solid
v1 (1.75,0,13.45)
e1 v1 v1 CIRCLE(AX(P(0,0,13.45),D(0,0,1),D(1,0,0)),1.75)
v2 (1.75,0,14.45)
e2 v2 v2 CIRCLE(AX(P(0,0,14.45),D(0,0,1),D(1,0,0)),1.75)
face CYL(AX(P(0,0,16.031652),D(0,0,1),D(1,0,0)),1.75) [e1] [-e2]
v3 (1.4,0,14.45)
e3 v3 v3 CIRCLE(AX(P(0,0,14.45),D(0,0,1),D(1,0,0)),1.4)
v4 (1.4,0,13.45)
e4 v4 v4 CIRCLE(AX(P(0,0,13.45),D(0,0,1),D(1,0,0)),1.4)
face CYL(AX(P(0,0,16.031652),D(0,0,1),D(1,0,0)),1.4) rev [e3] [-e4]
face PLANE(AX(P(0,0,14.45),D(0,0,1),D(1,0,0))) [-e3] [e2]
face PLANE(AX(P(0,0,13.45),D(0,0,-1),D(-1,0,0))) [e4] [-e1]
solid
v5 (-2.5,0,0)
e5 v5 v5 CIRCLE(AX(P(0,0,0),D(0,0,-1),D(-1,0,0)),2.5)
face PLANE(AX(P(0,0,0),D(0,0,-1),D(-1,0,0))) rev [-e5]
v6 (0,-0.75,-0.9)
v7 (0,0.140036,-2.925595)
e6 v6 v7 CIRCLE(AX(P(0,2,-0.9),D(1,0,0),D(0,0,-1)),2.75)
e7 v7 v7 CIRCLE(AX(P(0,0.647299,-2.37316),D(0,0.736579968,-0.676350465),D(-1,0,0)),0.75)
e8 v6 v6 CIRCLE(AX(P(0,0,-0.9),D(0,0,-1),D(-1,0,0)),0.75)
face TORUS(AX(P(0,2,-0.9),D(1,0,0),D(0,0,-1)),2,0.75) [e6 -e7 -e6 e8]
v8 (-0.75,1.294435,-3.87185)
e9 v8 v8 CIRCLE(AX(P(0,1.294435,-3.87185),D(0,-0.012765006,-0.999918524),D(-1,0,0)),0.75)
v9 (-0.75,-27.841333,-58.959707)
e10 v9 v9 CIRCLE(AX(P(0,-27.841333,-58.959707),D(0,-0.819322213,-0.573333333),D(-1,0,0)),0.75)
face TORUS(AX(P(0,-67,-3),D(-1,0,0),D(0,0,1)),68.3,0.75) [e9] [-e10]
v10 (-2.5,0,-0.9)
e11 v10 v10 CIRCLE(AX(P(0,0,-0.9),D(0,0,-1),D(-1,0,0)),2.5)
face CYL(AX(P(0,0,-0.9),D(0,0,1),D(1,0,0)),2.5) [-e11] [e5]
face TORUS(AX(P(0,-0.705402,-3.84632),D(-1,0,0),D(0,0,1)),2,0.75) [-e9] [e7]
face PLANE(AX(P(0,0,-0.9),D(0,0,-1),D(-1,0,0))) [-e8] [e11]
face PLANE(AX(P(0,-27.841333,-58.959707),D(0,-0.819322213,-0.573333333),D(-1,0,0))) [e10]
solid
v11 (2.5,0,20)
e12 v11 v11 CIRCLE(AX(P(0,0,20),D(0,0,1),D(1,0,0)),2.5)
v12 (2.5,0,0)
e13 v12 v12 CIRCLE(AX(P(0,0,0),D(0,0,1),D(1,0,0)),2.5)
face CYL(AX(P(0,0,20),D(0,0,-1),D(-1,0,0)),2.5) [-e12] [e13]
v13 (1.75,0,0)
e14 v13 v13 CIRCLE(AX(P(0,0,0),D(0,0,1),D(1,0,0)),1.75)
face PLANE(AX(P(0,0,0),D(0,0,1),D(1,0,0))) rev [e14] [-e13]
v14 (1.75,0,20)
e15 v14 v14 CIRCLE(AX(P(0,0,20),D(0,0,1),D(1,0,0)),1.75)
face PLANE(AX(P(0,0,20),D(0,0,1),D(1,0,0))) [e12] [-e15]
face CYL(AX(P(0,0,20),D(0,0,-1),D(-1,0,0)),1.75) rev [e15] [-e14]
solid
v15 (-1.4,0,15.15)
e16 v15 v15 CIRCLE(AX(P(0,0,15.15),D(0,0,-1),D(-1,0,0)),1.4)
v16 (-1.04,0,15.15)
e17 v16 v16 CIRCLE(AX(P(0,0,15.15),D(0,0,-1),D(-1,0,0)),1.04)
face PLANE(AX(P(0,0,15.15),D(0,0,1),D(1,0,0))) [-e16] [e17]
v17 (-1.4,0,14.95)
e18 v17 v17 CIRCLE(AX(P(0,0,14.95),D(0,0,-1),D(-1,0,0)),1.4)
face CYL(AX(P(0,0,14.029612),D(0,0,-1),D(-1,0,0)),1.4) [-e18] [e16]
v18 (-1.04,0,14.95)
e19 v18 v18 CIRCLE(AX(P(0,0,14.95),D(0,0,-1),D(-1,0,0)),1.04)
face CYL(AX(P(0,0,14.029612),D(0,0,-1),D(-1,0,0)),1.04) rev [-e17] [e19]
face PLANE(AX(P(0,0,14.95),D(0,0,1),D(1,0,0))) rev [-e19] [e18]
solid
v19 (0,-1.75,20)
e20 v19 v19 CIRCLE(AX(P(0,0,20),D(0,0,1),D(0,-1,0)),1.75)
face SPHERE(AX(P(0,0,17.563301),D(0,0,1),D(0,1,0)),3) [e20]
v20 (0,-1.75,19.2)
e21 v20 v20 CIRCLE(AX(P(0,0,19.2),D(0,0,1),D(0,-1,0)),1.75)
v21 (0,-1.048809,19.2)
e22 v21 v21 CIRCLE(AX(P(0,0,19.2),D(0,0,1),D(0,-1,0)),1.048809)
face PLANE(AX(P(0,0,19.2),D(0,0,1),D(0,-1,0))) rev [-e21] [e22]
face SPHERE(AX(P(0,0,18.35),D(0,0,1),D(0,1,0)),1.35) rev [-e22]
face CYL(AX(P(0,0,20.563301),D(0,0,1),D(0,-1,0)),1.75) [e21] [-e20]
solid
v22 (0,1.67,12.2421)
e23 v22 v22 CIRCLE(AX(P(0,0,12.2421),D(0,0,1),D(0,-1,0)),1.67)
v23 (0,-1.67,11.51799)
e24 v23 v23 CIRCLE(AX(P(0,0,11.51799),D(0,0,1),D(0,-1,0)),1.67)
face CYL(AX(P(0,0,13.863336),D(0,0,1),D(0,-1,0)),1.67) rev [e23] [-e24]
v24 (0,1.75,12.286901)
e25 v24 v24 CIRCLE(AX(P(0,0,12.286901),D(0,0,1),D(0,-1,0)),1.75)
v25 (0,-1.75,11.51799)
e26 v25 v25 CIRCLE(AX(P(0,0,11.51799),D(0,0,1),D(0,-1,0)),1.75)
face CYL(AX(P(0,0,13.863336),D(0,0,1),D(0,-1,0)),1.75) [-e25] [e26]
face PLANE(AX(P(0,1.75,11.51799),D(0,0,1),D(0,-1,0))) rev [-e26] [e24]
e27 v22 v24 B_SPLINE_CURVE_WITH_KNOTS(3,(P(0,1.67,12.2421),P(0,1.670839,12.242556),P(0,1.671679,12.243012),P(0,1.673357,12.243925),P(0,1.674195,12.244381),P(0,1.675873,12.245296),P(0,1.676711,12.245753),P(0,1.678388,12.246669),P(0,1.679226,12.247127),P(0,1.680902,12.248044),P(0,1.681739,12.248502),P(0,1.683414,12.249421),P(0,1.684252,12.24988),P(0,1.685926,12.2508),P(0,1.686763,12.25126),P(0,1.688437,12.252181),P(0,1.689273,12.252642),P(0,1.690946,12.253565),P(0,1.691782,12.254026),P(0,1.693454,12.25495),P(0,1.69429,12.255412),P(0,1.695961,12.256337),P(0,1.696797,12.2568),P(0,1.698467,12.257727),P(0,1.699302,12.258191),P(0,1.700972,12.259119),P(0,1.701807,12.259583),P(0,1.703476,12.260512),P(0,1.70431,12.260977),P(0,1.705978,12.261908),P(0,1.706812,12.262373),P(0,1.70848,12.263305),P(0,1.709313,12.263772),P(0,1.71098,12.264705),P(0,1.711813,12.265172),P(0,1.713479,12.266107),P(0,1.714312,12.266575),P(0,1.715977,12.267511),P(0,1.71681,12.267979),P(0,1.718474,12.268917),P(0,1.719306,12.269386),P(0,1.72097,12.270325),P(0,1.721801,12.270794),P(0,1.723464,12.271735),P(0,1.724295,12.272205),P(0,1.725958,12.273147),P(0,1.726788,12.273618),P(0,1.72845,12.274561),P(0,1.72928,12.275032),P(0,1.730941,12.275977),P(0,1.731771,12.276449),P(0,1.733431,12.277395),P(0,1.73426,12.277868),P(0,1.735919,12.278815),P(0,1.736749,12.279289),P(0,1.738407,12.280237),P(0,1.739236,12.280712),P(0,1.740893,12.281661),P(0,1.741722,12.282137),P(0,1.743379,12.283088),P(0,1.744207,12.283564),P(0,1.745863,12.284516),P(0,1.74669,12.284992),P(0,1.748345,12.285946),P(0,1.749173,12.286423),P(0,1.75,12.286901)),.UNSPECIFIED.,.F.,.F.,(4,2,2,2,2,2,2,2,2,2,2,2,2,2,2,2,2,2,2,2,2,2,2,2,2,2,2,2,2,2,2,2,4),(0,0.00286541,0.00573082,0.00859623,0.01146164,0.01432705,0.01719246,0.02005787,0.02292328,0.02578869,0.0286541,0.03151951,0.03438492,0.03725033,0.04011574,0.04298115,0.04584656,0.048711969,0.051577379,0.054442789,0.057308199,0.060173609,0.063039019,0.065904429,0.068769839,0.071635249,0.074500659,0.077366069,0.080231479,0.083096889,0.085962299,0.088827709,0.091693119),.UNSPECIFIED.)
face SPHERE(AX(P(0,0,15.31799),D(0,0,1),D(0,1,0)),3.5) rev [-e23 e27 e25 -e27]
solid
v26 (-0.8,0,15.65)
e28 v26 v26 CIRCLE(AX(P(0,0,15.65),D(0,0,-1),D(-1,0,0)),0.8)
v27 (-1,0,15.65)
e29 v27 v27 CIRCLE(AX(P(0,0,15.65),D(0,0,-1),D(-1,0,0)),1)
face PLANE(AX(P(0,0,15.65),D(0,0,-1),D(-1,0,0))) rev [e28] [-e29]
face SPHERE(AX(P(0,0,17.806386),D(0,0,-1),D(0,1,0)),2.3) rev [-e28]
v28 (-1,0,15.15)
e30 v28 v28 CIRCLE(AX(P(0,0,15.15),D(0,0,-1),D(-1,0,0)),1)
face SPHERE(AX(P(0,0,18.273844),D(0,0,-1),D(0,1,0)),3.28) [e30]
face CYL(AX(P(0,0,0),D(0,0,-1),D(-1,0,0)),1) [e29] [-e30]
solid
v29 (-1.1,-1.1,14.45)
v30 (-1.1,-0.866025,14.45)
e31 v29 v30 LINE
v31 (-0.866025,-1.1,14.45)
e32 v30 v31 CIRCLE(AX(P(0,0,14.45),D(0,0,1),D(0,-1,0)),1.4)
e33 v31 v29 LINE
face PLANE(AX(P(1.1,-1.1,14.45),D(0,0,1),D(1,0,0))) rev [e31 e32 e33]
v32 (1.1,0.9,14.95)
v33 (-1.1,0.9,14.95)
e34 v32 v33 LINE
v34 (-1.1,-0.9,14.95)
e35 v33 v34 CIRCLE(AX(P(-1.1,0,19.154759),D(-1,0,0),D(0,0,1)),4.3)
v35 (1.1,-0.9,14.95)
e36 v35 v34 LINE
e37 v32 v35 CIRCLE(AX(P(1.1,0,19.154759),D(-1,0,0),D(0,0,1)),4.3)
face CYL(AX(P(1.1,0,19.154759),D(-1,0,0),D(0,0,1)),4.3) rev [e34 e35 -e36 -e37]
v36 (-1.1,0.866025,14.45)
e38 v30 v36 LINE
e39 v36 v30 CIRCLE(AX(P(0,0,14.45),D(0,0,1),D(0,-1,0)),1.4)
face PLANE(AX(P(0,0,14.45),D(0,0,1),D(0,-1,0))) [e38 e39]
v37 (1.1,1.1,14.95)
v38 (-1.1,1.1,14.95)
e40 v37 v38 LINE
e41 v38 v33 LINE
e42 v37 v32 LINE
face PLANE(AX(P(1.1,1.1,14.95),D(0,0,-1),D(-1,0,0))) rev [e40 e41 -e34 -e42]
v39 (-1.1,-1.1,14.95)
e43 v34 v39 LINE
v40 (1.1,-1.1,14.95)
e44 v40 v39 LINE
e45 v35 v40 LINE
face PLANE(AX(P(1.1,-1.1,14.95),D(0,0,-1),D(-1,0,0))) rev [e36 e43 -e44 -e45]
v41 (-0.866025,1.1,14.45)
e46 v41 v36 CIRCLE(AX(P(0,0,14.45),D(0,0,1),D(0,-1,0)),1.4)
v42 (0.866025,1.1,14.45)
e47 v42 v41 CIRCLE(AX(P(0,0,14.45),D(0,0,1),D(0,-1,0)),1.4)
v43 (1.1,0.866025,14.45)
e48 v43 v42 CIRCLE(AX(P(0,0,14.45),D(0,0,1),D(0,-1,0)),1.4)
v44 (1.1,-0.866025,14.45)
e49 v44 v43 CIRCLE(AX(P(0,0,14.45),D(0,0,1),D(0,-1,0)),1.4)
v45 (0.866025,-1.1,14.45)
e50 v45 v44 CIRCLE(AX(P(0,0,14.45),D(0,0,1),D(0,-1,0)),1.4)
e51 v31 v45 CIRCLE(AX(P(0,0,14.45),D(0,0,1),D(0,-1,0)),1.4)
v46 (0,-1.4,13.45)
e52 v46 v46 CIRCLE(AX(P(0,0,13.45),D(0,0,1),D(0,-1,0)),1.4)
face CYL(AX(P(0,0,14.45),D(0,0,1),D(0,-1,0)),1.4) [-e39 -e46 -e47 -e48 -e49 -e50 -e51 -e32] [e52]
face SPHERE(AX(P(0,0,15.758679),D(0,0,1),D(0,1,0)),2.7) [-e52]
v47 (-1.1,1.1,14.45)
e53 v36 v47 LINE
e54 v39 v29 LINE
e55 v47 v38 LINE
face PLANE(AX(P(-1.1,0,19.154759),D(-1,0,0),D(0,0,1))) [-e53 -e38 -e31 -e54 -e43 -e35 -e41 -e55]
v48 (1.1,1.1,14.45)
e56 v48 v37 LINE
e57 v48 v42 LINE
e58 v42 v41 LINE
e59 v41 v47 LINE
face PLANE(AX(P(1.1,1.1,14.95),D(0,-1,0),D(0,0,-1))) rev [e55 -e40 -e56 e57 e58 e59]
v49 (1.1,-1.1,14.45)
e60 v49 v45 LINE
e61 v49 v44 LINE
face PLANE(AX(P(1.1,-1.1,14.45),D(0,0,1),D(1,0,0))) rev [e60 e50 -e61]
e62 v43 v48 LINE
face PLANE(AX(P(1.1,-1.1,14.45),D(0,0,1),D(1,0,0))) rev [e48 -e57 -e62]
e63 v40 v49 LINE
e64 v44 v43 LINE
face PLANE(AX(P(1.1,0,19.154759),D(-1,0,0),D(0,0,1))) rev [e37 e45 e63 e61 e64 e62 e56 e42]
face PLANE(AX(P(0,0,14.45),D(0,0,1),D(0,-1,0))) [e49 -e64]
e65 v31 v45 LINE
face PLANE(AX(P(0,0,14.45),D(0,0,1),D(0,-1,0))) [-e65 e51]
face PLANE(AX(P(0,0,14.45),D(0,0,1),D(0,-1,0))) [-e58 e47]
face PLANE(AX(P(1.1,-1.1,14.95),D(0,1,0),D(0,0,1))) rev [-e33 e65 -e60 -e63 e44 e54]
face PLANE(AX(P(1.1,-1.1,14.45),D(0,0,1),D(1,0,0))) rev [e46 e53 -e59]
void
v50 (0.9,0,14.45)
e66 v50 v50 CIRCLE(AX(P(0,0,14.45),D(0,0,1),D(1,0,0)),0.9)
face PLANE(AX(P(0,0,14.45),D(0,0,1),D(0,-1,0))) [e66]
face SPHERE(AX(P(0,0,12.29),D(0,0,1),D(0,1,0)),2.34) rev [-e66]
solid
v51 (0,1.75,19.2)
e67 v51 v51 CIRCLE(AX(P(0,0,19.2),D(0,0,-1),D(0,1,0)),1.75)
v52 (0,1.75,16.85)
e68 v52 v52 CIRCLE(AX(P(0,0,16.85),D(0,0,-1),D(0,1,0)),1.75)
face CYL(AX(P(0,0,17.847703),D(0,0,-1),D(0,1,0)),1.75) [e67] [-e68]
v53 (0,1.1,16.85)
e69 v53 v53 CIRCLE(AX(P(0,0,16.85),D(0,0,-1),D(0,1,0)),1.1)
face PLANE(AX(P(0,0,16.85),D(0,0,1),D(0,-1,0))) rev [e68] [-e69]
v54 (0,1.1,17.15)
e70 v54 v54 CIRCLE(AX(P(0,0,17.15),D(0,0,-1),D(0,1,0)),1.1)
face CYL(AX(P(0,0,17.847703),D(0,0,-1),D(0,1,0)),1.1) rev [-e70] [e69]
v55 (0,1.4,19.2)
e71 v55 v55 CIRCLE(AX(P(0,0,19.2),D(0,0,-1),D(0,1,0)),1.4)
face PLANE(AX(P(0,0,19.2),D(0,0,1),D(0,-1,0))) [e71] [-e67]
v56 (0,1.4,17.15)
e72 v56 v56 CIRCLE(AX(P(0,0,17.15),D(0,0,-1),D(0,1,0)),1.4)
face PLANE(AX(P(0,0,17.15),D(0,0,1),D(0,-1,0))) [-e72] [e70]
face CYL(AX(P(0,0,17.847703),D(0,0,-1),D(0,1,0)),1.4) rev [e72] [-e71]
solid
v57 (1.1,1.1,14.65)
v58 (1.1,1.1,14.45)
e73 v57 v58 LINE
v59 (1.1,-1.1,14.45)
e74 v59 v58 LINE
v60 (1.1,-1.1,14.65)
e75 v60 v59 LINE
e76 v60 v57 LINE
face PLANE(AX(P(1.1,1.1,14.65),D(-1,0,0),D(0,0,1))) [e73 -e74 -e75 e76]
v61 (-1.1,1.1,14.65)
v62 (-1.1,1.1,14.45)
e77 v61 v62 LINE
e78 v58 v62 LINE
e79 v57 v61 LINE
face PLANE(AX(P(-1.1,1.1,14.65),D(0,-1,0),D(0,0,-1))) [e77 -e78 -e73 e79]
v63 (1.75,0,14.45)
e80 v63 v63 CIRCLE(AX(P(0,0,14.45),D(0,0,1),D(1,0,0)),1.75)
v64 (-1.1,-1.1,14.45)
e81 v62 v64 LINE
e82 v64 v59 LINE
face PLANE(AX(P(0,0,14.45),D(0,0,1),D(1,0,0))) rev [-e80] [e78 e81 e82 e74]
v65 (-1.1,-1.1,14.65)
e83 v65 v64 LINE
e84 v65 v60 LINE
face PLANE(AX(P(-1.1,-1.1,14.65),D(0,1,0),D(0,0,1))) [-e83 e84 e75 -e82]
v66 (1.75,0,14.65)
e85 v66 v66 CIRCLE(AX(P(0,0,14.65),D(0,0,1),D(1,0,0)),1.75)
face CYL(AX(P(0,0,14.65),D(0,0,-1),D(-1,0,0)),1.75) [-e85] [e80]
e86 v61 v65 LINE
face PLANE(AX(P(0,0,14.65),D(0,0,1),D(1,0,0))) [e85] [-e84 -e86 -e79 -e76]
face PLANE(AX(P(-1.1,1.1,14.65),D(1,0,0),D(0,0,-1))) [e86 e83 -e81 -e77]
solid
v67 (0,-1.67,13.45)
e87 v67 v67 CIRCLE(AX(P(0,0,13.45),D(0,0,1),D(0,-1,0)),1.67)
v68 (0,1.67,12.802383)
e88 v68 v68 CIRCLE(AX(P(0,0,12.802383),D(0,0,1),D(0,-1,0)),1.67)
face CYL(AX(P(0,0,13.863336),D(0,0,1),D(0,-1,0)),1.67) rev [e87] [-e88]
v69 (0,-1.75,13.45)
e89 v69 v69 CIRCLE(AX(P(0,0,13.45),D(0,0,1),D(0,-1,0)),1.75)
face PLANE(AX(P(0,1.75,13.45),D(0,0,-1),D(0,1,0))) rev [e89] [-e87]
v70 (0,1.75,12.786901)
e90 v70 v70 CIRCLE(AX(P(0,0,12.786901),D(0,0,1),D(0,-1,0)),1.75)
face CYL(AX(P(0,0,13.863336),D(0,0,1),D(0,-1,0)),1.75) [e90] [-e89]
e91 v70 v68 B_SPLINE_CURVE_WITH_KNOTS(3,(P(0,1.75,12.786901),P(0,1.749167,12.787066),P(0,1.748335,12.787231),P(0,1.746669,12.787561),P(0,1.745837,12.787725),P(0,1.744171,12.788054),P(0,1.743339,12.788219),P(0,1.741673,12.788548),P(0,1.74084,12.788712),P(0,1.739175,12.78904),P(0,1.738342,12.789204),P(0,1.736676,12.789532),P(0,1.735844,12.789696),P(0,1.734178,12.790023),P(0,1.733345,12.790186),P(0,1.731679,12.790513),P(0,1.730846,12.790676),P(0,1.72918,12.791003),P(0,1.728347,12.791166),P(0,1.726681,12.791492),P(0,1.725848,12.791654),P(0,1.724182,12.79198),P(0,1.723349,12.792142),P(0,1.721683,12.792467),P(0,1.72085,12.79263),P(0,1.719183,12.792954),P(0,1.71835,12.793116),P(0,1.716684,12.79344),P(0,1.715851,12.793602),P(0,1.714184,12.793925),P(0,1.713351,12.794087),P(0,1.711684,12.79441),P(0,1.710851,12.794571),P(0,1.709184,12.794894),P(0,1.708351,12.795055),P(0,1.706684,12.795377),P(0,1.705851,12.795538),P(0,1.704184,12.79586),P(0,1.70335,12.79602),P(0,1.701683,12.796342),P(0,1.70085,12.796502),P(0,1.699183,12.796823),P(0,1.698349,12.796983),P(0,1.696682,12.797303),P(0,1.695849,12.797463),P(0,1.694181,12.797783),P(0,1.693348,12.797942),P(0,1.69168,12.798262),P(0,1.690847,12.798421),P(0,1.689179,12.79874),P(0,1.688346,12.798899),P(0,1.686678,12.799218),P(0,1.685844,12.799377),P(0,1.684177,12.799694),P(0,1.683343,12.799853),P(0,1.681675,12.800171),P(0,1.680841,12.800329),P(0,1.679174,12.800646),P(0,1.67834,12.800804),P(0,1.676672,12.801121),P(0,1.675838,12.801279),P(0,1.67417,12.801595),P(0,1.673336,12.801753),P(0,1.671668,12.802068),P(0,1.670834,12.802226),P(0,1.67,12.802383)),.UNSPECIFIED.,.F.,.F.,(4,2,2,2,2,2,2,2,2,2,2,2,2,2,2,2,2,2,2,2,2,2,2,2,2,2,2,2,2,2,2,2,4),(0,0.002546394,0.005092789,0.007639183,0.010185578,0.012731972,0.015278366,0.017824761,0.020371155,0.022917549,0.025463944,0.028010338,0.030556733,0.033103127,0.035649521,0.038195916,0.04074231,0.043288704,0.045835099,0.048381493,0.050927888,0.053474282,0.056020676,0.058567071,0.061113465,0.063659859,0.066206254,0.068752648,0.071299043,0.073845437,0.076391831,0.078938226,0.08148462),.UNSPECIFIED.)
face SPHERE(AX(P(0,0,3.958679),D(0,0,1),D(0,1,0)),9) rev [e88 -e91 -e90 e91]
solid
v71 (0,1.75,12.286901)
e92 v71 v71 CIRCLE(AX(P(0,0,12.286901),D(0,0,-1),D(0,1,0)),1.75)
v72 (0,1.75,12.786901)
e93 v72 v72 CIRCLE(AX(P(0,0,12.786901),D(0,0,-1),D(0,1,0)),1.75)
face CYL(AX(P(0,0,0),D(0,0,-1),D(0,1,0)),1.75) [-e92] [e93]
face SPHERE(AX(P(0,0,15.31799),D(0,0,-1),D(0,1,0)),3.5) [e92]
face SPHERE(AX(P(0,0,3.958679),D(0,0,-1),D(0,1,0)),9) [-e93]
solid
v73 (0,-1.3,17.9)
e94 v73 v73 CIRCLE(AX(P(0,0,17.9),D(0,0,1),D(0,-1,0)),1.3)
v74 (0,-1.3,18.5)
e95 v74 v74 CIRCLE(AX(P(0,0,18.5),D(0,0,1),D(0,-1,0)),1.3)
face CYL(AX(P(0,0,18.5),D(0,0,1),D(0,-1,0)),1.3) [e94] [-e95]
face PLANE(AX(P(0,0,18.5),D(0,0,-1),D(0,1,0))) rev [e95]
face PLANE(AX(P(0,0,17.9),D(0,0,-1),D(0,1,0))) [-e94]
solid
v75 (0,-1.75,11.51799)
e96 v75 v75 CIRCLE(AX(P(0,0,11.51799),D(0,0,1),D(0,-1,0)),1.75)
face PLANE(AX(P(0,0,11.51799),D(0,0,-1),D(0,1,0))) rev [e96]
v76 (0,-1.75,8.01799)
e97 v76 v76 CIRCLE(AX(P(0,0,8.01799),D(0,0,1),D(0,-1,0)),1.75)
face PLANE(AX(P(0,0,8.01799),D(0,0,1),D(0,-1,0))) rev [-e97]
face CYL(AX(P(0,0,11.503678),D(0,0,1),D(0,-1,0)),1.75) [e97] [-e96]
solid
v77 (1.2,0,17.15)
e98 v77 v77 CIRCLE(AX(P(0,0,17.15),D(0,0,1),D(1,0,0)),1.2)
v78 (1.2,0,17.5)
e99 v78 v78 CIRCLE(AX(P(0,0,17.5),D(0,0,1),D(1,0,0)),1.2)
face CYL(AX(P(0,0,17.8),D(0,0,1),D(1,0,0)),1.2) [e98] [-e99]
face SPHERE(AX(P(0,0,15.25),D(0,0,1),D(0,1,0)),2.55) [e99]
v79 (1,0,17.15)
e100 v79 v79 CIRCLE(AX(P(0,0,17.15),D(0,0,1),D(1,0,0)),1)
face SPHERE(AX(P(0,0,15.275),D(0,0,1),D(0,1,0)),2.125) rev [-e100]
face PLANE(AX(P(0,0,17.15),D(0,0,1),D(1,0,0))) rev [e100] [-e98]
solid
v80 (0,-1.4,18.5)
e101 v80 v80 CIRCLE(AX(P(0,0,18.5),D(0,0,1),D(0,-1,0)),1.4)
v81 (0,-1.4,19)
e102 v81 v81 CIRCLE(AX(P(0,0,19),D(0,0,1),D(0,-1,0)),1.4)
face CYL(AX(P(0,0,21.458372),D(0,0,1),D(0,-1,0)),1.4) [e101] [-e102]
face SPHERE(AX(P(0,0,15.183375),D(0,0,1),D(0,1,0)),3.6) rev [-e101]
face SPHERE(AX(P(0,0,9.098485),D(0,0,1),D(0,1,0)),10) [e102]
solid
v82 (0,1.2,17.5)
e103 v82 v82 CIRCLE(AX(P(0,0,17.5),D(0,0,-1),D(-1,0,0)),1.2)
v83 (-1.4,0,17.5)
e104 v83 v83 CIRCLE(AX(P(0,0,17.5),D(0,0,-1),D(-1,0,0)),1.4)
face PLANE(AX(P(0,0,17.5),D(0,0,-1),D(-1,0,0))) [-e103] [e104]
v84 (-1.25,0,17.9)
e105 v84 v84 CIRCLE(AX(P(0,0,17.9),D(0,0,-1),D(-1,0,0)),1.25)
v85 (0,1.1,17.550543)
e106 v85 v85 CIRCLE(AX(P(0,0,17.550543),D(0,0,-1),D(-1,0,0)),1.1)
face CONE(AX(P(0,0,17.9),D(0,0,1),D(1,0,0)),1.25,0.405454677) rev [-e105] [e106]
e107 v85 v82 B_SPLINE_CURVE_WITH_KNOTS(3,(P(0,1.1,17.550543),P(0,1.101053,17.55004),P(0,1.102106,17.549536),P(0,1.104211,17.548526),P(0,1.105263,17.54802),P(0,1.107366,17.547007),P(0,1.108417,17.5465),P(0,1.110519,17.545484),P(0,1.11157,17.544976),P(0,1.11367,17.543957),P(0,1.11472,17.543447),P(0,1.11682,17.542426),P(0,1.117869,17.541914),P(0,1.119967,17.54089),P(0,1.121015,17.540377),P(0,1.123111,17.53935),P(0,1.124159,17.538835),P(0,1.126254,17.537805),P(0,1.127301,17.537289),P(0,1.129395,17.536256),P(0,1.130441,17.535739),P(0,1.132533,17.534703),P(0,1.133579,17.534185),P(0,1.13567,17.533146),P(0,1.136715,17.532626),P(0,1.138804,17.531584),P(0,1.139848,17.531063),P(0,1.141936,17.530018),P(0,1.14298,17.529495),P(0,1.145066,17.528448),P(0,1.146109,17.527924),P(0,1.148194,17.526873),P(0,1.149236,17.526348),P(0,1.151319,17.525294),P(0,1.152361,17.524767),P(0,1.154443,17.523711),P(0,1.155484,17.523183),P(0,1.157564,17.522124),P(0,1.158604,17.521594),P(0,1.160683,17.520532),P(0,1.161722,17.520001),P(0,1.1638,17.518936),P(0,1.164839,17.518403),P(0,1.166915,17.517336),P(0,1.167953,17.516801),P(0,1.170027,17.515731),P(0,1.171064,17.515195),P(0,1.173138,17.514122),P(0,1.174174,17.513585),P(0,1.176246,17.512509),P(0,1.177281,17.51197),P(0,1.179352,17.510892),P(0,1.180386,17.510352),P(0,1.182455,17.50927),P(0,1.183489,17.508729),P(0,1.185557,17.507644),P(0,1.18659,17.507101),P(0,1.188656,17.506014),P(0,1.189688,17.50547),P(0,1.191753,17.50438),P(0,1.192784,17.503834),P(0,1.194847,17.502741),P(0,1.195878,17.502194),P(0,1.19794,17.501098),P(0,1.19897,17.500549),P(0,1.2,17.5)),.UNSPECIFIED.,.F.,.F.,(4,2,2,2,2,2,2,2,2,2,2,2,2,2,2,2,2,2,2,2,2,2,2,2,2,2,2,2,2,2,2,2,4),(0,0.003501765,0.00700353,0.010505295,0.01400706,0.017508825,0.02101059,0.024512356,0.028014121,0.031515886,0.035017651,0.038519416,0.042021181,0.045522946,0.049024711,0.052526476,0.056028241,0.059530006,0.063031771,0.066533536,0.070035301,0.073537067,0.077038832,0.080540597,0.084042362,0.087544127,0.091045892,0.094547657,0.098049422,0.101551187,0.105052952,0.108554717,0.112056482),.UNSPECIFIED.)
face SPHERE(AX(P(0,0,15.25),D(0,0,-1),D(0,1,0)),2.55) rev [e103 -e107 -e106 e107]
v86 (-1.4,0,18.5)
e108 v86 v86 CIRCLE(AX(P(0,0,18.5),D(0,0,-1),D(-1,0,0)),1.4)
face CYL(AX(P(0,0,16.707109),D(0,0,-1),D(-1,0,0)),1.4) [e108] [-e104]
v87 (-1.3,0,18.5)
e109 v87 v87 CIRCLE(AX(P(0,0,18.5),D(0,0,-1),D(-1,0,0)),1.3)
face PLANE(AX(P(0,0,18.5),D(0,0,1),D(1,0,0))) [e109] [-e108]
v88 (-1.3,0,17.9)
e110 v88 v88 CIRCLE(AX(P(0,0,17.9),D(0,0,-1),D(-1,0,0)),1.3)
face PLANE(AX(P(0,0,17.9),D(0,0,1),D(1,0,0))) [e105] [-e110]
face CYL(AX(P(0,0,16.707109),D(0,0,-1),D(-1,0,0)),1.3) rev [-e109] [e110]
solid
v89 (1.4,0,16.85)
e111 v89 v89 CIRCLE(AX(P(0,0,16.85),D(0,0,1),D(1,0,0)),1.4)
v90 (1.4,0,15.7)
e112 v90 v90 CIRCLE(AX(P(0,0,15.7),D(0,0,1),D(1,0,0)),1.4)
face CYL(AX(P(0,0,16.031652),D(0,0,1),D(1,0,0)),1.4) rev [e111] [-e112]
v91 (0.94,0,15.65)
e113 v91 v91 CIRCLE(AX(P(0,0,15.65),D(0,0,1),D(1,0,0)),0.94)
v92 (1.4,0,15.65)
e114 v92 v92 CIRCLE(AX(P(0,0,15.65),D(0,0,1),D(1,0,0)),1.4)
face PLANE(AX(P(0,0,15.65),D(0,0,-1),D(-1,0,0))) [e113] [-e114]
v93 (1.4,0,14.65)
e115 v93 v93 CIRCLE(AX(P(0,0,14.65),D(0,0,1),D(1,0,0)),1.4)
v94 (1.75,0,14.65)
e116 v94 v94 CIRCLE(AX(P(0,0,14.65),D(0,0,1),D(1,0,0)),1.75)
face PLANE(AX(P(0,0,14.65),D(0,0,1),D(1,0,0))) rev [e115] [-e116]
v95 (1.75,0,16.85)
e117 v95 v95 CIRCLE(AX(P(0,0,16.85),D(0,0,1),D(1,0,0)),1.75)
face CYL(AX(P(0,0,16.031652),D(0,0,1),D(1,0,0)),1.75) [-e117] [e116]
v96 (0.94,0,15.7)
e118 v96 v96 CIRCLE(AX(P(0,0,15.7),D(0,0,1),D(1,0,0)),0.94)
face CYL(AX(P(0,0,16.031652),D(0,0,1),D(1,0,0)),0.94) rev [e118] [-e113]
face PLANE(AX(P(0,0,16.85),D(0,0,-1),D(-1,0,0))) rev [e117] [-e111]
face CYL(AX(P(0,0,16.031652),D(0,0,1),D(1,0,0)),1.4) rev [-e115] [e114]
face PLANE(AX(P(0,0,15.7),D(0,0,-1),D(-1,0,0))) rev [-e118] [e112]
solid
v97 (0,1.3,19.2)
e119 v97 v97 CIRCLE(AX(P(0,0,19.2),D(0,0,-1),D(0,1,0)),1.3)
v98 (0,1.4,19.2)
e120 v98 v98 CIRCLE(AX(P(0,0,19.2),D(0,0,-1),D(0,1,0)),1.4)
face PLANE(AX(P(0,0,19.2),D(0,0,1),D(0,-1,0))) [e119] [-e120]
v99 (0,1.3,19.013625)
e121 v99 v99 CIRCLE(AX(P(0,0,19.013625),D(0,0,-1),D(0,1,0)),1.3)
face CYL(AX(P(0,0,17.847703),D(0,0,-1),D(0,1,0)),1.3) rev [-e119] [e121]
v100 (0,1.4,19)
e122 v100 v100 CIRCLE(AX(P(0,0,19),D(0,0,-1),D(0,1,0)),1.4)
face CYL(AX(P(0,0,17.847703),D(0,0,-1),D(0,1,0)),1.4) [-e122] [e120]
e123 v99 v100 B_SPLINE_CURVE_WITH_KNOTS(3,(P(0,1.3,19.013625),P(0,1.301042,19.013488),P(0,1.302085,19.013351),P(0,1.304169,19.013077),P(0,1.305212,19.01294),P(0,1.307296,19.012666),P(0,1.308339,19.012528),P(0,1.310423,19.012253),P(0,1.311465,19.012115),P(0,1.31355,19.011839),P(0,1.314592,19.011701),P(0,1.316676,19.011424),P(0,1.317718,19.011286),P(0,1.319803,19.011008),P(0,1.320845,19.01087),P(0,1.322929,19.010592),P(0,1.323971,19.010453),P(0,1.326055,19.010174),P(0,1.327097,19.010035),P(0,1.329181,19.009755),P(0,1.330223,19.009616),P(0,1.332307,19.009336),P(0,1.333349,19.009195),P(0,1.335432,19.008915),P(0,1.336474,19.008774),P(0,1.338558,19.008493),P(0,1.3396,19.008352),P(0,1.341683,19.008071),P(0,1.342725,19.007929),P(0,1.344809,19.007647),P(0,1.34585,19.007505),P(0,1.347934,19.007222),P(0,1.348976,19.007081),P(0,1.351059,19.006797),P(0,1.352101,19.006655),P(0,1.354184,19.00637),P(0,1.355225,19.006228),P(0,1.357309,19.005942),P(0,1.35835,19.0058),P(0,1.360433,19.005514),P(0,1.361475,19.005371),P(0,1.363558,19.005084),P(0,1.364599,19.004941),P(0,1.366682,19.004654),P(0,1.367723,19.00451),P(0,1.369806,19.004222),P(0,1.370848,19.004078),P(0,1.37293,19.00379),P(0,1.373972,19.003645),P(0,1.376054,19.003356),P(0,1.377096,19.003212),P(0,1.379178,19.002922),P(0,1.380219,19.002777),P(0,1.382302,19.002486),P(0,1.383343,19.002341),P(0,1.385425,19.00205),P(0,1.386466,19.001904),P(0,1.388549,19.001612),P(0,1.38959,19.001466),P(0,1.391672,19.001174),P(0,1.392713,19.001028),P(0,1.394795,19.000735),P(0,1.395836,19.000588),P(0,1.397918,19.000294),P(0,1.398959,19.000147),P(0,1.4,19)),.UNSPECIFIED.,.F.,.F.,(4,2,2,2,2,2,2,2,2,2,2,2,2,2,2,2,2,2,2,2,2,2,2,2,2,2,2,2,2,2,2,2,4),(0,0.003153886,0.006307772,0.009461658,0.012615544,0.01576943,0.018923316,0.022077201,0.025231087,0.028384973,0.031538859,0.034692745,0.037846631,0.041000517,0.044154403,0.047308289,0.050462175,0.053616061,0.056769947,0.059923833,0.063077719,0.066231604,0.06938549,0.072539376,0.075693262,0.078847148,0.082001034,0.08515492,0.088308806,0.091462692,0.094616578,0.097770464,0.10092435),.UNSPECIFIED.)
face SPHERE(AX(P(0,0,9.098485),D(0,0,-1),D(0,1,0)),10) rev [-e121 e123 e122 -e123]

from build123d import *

# Parameters (mm, degrees)
SKETCH1_R             = 2.5
SKETCH1_R_2           = 1.75
EXTRUDE1_DEPTH        = 20
SKETCH4_W             = 0.6
SKETCH4_H             = 1.3
EXTRUDE2_DEPTH        = 1.1
SKETCH8_W             = 1
SKETCH8_H             = 1.4
SKETCH9_W             = 0.5
SKETCH9_H             = 1.75
SKETCH10_W            = 3.5
SKETCH10_H            = 1.75
SKETCH11_W            = 2.35
SKETCH11_H            = 0.35
SKETCH11_W_2          = 0.3
SKETCH11_H_2          = 0.3
SKETCH_2_W            = 0.6
SKETCH_2_H            = 0.1
SKETCH_3_W            = 0.05
SKETCH_3_H            = 0.46
SKETCH_4_W            = 0.2
SKETCH_4_H            = 0.36
SKETCH12_R            = 1.75
SKETCH12_W            = 2.2
SKETCH12_H            = 2.2
EXTRUDE3_DEPTH        = 0.2
SKETCH14_R            = 2.5
EXTRUDE4_DEPTH        = 0.9
SKETCH16_R            = 0.75
REVOLVE16_START       = 13.45
REVOLVE16_OUTLINE_R   = 1.75
REVOLVE16_OUTLINE_R_2 = 1.4
REVOLVE16_DEPTH       = 1


# Read off the part's stored shape, not the designer's step: Revolve12, Revolve16
with BuildPart() as part:
    # Sketch1 → Extrude1 (new body)
    with BuildSketch(Plane.XY):
        Circle(SKETCH1_R)
        Circle(SKETCH1_R_2, mode=Mode.SUBTRACT)
    extrude(amount=EXTRUDE1_DEPTH)


with BuildPart() as body_2:
    # Sketch2 → Revolve1 (revolve)
    with BuildSketch(Plane(origin=(0, 0, 0), x_dir=(0, 0, -1), z_dir=(1, 0, 0))):
        with BuildLine():
            ThreePointArc((-19.7, 0), (-19.568605761, 0.580947502), (-19.2, 1.048808848))
            Line((-19.2, 1.048808848), (-19.2, 1.75))
            Line((-19.2, 1.75), (-20, 1.75))
            ThreePointArc((-20, 1.75), (-20.419005859, 0.919212772), (-20.563301414, 0))
            Line((-20.563301414, 0), (-19.7, 0))
        make_face()
    revolve(axis=Axis((0, 0, 20.563301414), (0, 0, -1)))


with BuildPart() as body_3:
    # Sketch3 → Revolve2 (revolve)
    with BuildSketch(Plane(origin=(0, 0, 0), x_dir=(0, 0, -1), z_dir=(1, 0, 0))):
        with BuildLine():
            Line((-19, 1.4), (-19, 0))
            Line((-19, 0), (-18.78337521, 0))
            ThreePointArc((-18.78337521, 0), (-18.711820281, 0.714195616), (-18.5, 1.4))
            Line((-18.5, 1.4), (-19, 1.4))
        make_face()
        with BuildLine():
            Line((-19, 0), (-19, 1.4))
            ThreePointArc((-19, 1.4), (-19.073833338, 0.701729878), (-19.098484964, 0))
            Line((-19.098484964, 0), (-19, 0))
        make_face()
    revolve(axis=Axis((0, 0, 21.458372104), (0, 0, -1)))


with BuildPart() as body_4:
    # Sketch4 → Revolve3 (revolve)
    with BuildSketch(Plane(origin=(0, 0, 0), x_dir=(0, 0, -1), z_dir=(1, 0, 0)), mode=Mode.PRIVATE) as revolve3_sk:
        with Locations((-18.2, 0.65)):
            Rectangle(SKETCH4_W, SKETCH4_H)
    revolve(revolve3_sk.sketch.rotate(Axis((0, 0, 18.5), (0, 0, -1)), 180), axis=Axis((0, 0, 18.5), (0, 0, -1)))


with BuildPart() as body_5:
    # Sketch → Revolve4 (revolve)
    with BuildSketch(Plane(origin=(0, 0, 0), x_dir=(0, 0, -1), z_dir=(1, 0, 0))):
        with BuildLine():
            Line((-17.5, 0), (-17.5, 1.2))
            ThreePointArc((-17.5, 1.2), (-17.723863375, 0.618465844), (-17.8, 0))
            Line((-17.8, 0), (-17.5, 0))
        make_face()
        with BuildLine():
            Line((-17.5, 1.2), (-17.5, 0))
            Line((-17.5, 0), (-17.4, 0))
            ThreePointArc((-17.4, 0), (-17.336552813, 0.515388203), (-17.15, 1))
            Line((-17.15, 1), (-17.15, 1.2))
            Line((-17.15, 1.2), (-17.5, 1.2))
        make_face()
    revolve(axis=Axis((0, 0, 17.8), (0, 0, -1)))


with BuildPart() as body_6:
    # Sketch5 → Revolve5 (revolve)
    with BuildSketch(Plane(origin=(0, 0, 0), x_dir=(0, 0, -1), z_dir=(1, 0, 0))):
        with BuildLine():
            ThreePointArc((-15.65, 0.8), (-15.542574092, 0.406394211), (-15.506385865, 0))
            Line((-15.506385865, 0), (-15.15, 0))
            Line((-15.15, 0), (-15.15, 1))
            Line((-15.15, 1), (-15.65, 1))
            Line((-15.65, 1), (-15.65, 0.8))
        make_face()
        with BuildLine():
            ThreePointArc((-15.15, 1), (-15.033117971, 0.506059474), (-14.993843786, 0))
            Line((-14.993843786, 0), (-15.15, 0))
            Line((-15.15, 0), (-15.15, 1))
        make_face()
    revolve(axis=Axis((0, 0, 0), (0, 0, 1)))


with BuildPart() as body_7:
    # Sketch6 → Extrude2 (new, symmetric)
    with BuildSketch(Plane(origin=(0, 0, 0), x_dir=(0, 0, -1), z_dir=(1, 0, 0))):
        with BuildLine():
            Line((-14.95, 1.1), (-14.45, 1.1))
            Line((-14.45, 1.1), (-14.45, -1.1))
            Line((-14.45, -1.1), (-14.95, -1.1))
            Line((-14.95, -1.1), (-14.95, -0.9))
            ThreePointArc((-14.95, -0.9), (-14.854759208, 0), (-14.95, 0.9))
            Line((-14.95, 0.9), (-14.95, 1.1))
        make_face()
    extrude(amount=EXTRUDE2_DEPTH, both=True)

    # Sketch7 → Cut-Revolve1 (revolve, cut)
    with BuildSketch(Plane(origin=(0, 0, 0), x_dir=(0, 0, -1), z_dir=(1, 0, 0))):
        with BuildLine():
            Line((-14.63, 0), (-14.45, 0))
            Line((-14.45, 0), (-14.45, 0.9))
            ThreePointArc((-14.45, 0.9), (-14.584558781, 0.458911756), (-14.63, 0))
        make_face()
    revolve(axis=Axis((0, 0, 15.752226789), (0, 0, -1)), mode=Mode.SUBTRACT)

    # Sketch8 → Revolve7 (revolve)
    with BuildSketch(Plane(origin=(0, 0, 0), x_dir=(0, 0, -1), z_dir=(1, 0, 0)), mode=Mode.PRIVATE) as revolve7_sk:
        with Locations((-13.95, 0.7)):
            Rectangle(SKETCH8_W, SKETCH8_H)
        with BuildLine():
            ThreePointArc((-13.45, 1.4), (-13.1583491, 0.726830776), (-13.058679276, 0))
            Line((-13.058679276, 0), (-13.45, 0))
            Line((-13.45, 0), (-13.45, 1.4))
        make_face()
    revolve(revolve7_sk.sketch.rotate(Axis((0, 0, 14.45), (0, 0, -1)), 180), axis=Axis((0, 0, 14.45), (0, 0, -1)))


with BuildPart() as body_8:
    # Sketch9 → Revolve8 (revolve)
    with BuildSketch(Plane(origin=(0, 0, 0), x_dir=(0, 0, -1), z_dir=(1, 0, 0))):
        with Locations((-12.536901068, 0.875)):
            Rectangle(SKETCH9_W, SKETCH9_H)
        with BuildLine():
            ThreePointArc((-12.286901068, 1.75), (-11.937249589, 0.905866658), (-11.817989981, 0))
            Line((-11.817989981, 0), (-12.286901068, 0))
            Line((-12.286901068, 0), (-12.286901068, 1.75))
        make_face()
        with BuildLine():
            Line((-12.786901068, 0), (-12.786901068, 1.75))
            ThreePointArc((-12.786901068, 1.75), (-12.915631775, 0.879205288), (-12.958679276, 0))
            Line((-12.958679276, 0), (-12.786901068, 0))
        make_face()
    revolve(axis=Axis((0, 0, 0), (0, 0, 1)))


with BuildPart() as body_9:
    # Sketch10 → Revolve9 (revolve)
    with BuildSketch(Plane(origin=(0, 0, 0), x_dir=(0, 0, -1), z_dir=(1, 0, 0)), mode=Mode.PRIVATE) as revolve9_sk:
        with Locations((-9.767989981, 0.875)):
            Rectangle(SKETCH10_W, SKETCH10_H)
    revolve(revolve9_sk.sketch.rotate(Axis((0, 0, 11.503678327), (0, 0, -1)), 180), axis=Axis((0, 0, 11.503678327), (0, 0, -1)))


with BuildPart() as body_10:
    # Sketch11 → Revolve10 (revolve)
    with BuildSketch(Plane(origin=(0, 0, 0), x_dir=(0, 0, -1), z_dir=(1, 0, 0))):
        with Locations((-18.025, 1.575)):
            Rectangle(SKETCH11_W, SKETCH11_H)
        with Locations((-17, 1.25)):
            Rectangle(SKETCH11_W_2, SKETCH11_H_2)
    revolve(axis=Axis((0, 0, 17.84770268), (0, 0, 1)))


with BuildPart() as body_11:
    # Sketch 2 → Revolve11 (revolve)
    with BuildSketch(Plane(origin=(0, 0, 0), x_dir=(0, 0, -1), z_dir=(1, 0, 0)), mode=Mode.PRIVATE) as revolve11_sk:
        with Locations((-18.2, 1.35)):
            Rectangle(SKETCH_2_W, SKETCH_2_H)
        with BuildLine():
            Line((-17.5, 1.2), (-17.5, 1.4))
            Line((-17.5, 1.4), (-17.9, 1.4))
            Line((-17.9, 1.4), (-17.9, 1.3))
            Line((-17.9, 1.3), (-17.9, 1.25))
            Line((-17.9, 1.25), (-17.550543414, 1.1))
            ThreePointArc((-17.550543414, 1.1), (-17.525821026, 1.150277644), (-17.5, 1.2))
        make_face()
    revolve(revolve11_sk.sketch.rotate(Axis((0, 0, 17.9), (0, 0, 1)), 90), axis=Axis((0, 0, 17.9), (0, 0, 1)))


with BuildPart() as body_12:
    # Revolve12 outline → Revolve12 (revolve)
    with BuildSketch(Plane.XZ):
        with BuildLine():
            ThreePointArc((1.29999999, 19.013624904), (1.350017189, 19.006938607), (1.40000001, 18.999999999))
            Line((1.40000001, 18.999999999), (1.4, 19.2))
            Line((1.4, 19.2), (1.3, 19.2))
            Line((1.3, 19.2), (1.29999999, 19.013624904))
        make_face()
    revolve(axis=Axis((0, 0, 0), (0, 0, 1)))


with BuildPart() as body_13:
    # Sketch 3 → Revolve13 (revolve)
    with BuildSketch(Plane(origin=(0, 0, 0), x_dir=(0, 0, -1), z_dir=(1, 0, 0))):
        Polygon((-14.65, 1.75), (-16.85, 1.75), (-16.85, 1.4), (-15.7, 1.4), (-15.65, 1.4), (-15.15, 1.4), (-14.95, 1.4), (-14.65, 1.4), align=None)
        with Locations((-15.675, 1.17)):
            Rectangle(SKETCH_3_W, SKETCH_3_H)
    revolve(axis=Axis((0, 0, 16.031651862), (0, 0, 1)))


with BuildPart() as body_14:
    # Sketch 4 → Revolve14 (revolve)
    with BuildSketch(Plane(origin=(0, 0, 0), x_dir=(0, 0, -1), z_dir=(1, 0, 0))):
        with Locations((-15.05, 1.22)):
            Rectangle(SKETCH_4_W, SKETCH_4_H)
    revolve(axis=Axis((0, 0, 14.029611912), (0, 0, 1)))


with BuildPart() as body_15:
    # Sketch12 → Extrude3 (new body)
    with BuildSketch(Plane.XY.offset(14.45)):
        Circle(SKETCH12_R)
        Rectangle(SKETCH12_W, SKETCH12_H, mode=Mode.SUBTRACT)
    extrude(amount=EXTRUDE3_DEPTH)


with BuildPart() as body_16:
    # Sketch13 → Revolve15 (revolve)
    with BuildSketch(Plane(origin=(0, 0, 0), x_dir=(0, 0, -1), z_dir=(1, 0, 0))):
        with BuildLine():
            Line((-13.45, 1.75), (-12.798583122, 1.75))
            Line((-12.798583122, 1.75), (-12.786901068, 1.75))
            ThreePointArc((-12.786901068, 1.75), (-12.794732698, 1.710017522), (-12.802383251, 1.67))
            Line((-12.802383251, 1.67), (-13.45, 1.67))
            Line((-13.45, 1.67), (-13.45, 1.75))
        make_face()
        with BuildLine():
            Line((-12.253042999, 1.75), (-11.517989981, 1.75))
            Line((-11.517989981, 1.75), (-11.517989981, 1.67))
            Line((-11.517989981, 1.67), (-12.242099866, 1.67))
            ThreePointArc((-12.242099866, 1.67), (-12.264238483, 1.710146715), (-12.286901068, 1.75))
            Line((-12.286901068, 1.75), (-12.253042999, 1.75))
        make_face()
    revolve(axis=Axis((0, 0, 13.863335633), (0, 0, 1)))


with BuildPart() as body_17:
    # Sketch14 → Extrude4 (new body)
    with BuildSketch(Plane(origin=(0, 0, 0), x_dir=(-1, 0, 0), z_dir=(0, 0, -1))):
        Circle(SKETCH14_R)
    extrude(amount=EXTRUDE4_DEPTH)

    # Sweep2: sweep along a path in Sketch15
    with BuildLine(Plane(origin=(0, 0, 0), x_dir=(0, 0, -1), z_dir=(1, 0, 0))) as sweep2_path:
        ThreePointArc((0.9, 0), (1.704548986, 0.168961789), (2.373159935, 0.64729907))
        ThreePointArc((2.373159935, 0.64729907), (3.053474118, 1.130734196), (3.871849882, 1.294435189))
        ThreePointArc((3.871849882, 1.294435189), (34.932424284, -6.624423155), (58.959707155, -27.841333333))
    # Sketch16 → Sweep2 (sweep)
    with BuildSketch(Plane(origin=(0, 0, -0.9), x_dir=(-1, 0, 0), z_dir=(0, 0, -1))):
        Circle(SKETCH16_R)
    sweep(path=sweep2_path.line)


with BuildPart() as body_18:
    # Revolve16 outline → Revolve16 (new body)
    with BuildSketch(Plane.XY.offset(REVOLVE16_START)):
        Circle(REVOLVE16_OUTLINE_R)
        Circle(REVOLVE16_OUTLINE_R_2, mode=Mode.SUBTRACT)
    extrude(amount=REVOLVE16_DEPTH)


solid = Compound([part.part, body_2.part, body_3.part, body_4.part, body_5.part, body_6.part, body_7.part, body_8.part, body_9.part, body_10.part, body_11.part, body_12.part, body_13.part, body_14.part, body_15.part, body_16.part, body_17.part, body_18.part])
